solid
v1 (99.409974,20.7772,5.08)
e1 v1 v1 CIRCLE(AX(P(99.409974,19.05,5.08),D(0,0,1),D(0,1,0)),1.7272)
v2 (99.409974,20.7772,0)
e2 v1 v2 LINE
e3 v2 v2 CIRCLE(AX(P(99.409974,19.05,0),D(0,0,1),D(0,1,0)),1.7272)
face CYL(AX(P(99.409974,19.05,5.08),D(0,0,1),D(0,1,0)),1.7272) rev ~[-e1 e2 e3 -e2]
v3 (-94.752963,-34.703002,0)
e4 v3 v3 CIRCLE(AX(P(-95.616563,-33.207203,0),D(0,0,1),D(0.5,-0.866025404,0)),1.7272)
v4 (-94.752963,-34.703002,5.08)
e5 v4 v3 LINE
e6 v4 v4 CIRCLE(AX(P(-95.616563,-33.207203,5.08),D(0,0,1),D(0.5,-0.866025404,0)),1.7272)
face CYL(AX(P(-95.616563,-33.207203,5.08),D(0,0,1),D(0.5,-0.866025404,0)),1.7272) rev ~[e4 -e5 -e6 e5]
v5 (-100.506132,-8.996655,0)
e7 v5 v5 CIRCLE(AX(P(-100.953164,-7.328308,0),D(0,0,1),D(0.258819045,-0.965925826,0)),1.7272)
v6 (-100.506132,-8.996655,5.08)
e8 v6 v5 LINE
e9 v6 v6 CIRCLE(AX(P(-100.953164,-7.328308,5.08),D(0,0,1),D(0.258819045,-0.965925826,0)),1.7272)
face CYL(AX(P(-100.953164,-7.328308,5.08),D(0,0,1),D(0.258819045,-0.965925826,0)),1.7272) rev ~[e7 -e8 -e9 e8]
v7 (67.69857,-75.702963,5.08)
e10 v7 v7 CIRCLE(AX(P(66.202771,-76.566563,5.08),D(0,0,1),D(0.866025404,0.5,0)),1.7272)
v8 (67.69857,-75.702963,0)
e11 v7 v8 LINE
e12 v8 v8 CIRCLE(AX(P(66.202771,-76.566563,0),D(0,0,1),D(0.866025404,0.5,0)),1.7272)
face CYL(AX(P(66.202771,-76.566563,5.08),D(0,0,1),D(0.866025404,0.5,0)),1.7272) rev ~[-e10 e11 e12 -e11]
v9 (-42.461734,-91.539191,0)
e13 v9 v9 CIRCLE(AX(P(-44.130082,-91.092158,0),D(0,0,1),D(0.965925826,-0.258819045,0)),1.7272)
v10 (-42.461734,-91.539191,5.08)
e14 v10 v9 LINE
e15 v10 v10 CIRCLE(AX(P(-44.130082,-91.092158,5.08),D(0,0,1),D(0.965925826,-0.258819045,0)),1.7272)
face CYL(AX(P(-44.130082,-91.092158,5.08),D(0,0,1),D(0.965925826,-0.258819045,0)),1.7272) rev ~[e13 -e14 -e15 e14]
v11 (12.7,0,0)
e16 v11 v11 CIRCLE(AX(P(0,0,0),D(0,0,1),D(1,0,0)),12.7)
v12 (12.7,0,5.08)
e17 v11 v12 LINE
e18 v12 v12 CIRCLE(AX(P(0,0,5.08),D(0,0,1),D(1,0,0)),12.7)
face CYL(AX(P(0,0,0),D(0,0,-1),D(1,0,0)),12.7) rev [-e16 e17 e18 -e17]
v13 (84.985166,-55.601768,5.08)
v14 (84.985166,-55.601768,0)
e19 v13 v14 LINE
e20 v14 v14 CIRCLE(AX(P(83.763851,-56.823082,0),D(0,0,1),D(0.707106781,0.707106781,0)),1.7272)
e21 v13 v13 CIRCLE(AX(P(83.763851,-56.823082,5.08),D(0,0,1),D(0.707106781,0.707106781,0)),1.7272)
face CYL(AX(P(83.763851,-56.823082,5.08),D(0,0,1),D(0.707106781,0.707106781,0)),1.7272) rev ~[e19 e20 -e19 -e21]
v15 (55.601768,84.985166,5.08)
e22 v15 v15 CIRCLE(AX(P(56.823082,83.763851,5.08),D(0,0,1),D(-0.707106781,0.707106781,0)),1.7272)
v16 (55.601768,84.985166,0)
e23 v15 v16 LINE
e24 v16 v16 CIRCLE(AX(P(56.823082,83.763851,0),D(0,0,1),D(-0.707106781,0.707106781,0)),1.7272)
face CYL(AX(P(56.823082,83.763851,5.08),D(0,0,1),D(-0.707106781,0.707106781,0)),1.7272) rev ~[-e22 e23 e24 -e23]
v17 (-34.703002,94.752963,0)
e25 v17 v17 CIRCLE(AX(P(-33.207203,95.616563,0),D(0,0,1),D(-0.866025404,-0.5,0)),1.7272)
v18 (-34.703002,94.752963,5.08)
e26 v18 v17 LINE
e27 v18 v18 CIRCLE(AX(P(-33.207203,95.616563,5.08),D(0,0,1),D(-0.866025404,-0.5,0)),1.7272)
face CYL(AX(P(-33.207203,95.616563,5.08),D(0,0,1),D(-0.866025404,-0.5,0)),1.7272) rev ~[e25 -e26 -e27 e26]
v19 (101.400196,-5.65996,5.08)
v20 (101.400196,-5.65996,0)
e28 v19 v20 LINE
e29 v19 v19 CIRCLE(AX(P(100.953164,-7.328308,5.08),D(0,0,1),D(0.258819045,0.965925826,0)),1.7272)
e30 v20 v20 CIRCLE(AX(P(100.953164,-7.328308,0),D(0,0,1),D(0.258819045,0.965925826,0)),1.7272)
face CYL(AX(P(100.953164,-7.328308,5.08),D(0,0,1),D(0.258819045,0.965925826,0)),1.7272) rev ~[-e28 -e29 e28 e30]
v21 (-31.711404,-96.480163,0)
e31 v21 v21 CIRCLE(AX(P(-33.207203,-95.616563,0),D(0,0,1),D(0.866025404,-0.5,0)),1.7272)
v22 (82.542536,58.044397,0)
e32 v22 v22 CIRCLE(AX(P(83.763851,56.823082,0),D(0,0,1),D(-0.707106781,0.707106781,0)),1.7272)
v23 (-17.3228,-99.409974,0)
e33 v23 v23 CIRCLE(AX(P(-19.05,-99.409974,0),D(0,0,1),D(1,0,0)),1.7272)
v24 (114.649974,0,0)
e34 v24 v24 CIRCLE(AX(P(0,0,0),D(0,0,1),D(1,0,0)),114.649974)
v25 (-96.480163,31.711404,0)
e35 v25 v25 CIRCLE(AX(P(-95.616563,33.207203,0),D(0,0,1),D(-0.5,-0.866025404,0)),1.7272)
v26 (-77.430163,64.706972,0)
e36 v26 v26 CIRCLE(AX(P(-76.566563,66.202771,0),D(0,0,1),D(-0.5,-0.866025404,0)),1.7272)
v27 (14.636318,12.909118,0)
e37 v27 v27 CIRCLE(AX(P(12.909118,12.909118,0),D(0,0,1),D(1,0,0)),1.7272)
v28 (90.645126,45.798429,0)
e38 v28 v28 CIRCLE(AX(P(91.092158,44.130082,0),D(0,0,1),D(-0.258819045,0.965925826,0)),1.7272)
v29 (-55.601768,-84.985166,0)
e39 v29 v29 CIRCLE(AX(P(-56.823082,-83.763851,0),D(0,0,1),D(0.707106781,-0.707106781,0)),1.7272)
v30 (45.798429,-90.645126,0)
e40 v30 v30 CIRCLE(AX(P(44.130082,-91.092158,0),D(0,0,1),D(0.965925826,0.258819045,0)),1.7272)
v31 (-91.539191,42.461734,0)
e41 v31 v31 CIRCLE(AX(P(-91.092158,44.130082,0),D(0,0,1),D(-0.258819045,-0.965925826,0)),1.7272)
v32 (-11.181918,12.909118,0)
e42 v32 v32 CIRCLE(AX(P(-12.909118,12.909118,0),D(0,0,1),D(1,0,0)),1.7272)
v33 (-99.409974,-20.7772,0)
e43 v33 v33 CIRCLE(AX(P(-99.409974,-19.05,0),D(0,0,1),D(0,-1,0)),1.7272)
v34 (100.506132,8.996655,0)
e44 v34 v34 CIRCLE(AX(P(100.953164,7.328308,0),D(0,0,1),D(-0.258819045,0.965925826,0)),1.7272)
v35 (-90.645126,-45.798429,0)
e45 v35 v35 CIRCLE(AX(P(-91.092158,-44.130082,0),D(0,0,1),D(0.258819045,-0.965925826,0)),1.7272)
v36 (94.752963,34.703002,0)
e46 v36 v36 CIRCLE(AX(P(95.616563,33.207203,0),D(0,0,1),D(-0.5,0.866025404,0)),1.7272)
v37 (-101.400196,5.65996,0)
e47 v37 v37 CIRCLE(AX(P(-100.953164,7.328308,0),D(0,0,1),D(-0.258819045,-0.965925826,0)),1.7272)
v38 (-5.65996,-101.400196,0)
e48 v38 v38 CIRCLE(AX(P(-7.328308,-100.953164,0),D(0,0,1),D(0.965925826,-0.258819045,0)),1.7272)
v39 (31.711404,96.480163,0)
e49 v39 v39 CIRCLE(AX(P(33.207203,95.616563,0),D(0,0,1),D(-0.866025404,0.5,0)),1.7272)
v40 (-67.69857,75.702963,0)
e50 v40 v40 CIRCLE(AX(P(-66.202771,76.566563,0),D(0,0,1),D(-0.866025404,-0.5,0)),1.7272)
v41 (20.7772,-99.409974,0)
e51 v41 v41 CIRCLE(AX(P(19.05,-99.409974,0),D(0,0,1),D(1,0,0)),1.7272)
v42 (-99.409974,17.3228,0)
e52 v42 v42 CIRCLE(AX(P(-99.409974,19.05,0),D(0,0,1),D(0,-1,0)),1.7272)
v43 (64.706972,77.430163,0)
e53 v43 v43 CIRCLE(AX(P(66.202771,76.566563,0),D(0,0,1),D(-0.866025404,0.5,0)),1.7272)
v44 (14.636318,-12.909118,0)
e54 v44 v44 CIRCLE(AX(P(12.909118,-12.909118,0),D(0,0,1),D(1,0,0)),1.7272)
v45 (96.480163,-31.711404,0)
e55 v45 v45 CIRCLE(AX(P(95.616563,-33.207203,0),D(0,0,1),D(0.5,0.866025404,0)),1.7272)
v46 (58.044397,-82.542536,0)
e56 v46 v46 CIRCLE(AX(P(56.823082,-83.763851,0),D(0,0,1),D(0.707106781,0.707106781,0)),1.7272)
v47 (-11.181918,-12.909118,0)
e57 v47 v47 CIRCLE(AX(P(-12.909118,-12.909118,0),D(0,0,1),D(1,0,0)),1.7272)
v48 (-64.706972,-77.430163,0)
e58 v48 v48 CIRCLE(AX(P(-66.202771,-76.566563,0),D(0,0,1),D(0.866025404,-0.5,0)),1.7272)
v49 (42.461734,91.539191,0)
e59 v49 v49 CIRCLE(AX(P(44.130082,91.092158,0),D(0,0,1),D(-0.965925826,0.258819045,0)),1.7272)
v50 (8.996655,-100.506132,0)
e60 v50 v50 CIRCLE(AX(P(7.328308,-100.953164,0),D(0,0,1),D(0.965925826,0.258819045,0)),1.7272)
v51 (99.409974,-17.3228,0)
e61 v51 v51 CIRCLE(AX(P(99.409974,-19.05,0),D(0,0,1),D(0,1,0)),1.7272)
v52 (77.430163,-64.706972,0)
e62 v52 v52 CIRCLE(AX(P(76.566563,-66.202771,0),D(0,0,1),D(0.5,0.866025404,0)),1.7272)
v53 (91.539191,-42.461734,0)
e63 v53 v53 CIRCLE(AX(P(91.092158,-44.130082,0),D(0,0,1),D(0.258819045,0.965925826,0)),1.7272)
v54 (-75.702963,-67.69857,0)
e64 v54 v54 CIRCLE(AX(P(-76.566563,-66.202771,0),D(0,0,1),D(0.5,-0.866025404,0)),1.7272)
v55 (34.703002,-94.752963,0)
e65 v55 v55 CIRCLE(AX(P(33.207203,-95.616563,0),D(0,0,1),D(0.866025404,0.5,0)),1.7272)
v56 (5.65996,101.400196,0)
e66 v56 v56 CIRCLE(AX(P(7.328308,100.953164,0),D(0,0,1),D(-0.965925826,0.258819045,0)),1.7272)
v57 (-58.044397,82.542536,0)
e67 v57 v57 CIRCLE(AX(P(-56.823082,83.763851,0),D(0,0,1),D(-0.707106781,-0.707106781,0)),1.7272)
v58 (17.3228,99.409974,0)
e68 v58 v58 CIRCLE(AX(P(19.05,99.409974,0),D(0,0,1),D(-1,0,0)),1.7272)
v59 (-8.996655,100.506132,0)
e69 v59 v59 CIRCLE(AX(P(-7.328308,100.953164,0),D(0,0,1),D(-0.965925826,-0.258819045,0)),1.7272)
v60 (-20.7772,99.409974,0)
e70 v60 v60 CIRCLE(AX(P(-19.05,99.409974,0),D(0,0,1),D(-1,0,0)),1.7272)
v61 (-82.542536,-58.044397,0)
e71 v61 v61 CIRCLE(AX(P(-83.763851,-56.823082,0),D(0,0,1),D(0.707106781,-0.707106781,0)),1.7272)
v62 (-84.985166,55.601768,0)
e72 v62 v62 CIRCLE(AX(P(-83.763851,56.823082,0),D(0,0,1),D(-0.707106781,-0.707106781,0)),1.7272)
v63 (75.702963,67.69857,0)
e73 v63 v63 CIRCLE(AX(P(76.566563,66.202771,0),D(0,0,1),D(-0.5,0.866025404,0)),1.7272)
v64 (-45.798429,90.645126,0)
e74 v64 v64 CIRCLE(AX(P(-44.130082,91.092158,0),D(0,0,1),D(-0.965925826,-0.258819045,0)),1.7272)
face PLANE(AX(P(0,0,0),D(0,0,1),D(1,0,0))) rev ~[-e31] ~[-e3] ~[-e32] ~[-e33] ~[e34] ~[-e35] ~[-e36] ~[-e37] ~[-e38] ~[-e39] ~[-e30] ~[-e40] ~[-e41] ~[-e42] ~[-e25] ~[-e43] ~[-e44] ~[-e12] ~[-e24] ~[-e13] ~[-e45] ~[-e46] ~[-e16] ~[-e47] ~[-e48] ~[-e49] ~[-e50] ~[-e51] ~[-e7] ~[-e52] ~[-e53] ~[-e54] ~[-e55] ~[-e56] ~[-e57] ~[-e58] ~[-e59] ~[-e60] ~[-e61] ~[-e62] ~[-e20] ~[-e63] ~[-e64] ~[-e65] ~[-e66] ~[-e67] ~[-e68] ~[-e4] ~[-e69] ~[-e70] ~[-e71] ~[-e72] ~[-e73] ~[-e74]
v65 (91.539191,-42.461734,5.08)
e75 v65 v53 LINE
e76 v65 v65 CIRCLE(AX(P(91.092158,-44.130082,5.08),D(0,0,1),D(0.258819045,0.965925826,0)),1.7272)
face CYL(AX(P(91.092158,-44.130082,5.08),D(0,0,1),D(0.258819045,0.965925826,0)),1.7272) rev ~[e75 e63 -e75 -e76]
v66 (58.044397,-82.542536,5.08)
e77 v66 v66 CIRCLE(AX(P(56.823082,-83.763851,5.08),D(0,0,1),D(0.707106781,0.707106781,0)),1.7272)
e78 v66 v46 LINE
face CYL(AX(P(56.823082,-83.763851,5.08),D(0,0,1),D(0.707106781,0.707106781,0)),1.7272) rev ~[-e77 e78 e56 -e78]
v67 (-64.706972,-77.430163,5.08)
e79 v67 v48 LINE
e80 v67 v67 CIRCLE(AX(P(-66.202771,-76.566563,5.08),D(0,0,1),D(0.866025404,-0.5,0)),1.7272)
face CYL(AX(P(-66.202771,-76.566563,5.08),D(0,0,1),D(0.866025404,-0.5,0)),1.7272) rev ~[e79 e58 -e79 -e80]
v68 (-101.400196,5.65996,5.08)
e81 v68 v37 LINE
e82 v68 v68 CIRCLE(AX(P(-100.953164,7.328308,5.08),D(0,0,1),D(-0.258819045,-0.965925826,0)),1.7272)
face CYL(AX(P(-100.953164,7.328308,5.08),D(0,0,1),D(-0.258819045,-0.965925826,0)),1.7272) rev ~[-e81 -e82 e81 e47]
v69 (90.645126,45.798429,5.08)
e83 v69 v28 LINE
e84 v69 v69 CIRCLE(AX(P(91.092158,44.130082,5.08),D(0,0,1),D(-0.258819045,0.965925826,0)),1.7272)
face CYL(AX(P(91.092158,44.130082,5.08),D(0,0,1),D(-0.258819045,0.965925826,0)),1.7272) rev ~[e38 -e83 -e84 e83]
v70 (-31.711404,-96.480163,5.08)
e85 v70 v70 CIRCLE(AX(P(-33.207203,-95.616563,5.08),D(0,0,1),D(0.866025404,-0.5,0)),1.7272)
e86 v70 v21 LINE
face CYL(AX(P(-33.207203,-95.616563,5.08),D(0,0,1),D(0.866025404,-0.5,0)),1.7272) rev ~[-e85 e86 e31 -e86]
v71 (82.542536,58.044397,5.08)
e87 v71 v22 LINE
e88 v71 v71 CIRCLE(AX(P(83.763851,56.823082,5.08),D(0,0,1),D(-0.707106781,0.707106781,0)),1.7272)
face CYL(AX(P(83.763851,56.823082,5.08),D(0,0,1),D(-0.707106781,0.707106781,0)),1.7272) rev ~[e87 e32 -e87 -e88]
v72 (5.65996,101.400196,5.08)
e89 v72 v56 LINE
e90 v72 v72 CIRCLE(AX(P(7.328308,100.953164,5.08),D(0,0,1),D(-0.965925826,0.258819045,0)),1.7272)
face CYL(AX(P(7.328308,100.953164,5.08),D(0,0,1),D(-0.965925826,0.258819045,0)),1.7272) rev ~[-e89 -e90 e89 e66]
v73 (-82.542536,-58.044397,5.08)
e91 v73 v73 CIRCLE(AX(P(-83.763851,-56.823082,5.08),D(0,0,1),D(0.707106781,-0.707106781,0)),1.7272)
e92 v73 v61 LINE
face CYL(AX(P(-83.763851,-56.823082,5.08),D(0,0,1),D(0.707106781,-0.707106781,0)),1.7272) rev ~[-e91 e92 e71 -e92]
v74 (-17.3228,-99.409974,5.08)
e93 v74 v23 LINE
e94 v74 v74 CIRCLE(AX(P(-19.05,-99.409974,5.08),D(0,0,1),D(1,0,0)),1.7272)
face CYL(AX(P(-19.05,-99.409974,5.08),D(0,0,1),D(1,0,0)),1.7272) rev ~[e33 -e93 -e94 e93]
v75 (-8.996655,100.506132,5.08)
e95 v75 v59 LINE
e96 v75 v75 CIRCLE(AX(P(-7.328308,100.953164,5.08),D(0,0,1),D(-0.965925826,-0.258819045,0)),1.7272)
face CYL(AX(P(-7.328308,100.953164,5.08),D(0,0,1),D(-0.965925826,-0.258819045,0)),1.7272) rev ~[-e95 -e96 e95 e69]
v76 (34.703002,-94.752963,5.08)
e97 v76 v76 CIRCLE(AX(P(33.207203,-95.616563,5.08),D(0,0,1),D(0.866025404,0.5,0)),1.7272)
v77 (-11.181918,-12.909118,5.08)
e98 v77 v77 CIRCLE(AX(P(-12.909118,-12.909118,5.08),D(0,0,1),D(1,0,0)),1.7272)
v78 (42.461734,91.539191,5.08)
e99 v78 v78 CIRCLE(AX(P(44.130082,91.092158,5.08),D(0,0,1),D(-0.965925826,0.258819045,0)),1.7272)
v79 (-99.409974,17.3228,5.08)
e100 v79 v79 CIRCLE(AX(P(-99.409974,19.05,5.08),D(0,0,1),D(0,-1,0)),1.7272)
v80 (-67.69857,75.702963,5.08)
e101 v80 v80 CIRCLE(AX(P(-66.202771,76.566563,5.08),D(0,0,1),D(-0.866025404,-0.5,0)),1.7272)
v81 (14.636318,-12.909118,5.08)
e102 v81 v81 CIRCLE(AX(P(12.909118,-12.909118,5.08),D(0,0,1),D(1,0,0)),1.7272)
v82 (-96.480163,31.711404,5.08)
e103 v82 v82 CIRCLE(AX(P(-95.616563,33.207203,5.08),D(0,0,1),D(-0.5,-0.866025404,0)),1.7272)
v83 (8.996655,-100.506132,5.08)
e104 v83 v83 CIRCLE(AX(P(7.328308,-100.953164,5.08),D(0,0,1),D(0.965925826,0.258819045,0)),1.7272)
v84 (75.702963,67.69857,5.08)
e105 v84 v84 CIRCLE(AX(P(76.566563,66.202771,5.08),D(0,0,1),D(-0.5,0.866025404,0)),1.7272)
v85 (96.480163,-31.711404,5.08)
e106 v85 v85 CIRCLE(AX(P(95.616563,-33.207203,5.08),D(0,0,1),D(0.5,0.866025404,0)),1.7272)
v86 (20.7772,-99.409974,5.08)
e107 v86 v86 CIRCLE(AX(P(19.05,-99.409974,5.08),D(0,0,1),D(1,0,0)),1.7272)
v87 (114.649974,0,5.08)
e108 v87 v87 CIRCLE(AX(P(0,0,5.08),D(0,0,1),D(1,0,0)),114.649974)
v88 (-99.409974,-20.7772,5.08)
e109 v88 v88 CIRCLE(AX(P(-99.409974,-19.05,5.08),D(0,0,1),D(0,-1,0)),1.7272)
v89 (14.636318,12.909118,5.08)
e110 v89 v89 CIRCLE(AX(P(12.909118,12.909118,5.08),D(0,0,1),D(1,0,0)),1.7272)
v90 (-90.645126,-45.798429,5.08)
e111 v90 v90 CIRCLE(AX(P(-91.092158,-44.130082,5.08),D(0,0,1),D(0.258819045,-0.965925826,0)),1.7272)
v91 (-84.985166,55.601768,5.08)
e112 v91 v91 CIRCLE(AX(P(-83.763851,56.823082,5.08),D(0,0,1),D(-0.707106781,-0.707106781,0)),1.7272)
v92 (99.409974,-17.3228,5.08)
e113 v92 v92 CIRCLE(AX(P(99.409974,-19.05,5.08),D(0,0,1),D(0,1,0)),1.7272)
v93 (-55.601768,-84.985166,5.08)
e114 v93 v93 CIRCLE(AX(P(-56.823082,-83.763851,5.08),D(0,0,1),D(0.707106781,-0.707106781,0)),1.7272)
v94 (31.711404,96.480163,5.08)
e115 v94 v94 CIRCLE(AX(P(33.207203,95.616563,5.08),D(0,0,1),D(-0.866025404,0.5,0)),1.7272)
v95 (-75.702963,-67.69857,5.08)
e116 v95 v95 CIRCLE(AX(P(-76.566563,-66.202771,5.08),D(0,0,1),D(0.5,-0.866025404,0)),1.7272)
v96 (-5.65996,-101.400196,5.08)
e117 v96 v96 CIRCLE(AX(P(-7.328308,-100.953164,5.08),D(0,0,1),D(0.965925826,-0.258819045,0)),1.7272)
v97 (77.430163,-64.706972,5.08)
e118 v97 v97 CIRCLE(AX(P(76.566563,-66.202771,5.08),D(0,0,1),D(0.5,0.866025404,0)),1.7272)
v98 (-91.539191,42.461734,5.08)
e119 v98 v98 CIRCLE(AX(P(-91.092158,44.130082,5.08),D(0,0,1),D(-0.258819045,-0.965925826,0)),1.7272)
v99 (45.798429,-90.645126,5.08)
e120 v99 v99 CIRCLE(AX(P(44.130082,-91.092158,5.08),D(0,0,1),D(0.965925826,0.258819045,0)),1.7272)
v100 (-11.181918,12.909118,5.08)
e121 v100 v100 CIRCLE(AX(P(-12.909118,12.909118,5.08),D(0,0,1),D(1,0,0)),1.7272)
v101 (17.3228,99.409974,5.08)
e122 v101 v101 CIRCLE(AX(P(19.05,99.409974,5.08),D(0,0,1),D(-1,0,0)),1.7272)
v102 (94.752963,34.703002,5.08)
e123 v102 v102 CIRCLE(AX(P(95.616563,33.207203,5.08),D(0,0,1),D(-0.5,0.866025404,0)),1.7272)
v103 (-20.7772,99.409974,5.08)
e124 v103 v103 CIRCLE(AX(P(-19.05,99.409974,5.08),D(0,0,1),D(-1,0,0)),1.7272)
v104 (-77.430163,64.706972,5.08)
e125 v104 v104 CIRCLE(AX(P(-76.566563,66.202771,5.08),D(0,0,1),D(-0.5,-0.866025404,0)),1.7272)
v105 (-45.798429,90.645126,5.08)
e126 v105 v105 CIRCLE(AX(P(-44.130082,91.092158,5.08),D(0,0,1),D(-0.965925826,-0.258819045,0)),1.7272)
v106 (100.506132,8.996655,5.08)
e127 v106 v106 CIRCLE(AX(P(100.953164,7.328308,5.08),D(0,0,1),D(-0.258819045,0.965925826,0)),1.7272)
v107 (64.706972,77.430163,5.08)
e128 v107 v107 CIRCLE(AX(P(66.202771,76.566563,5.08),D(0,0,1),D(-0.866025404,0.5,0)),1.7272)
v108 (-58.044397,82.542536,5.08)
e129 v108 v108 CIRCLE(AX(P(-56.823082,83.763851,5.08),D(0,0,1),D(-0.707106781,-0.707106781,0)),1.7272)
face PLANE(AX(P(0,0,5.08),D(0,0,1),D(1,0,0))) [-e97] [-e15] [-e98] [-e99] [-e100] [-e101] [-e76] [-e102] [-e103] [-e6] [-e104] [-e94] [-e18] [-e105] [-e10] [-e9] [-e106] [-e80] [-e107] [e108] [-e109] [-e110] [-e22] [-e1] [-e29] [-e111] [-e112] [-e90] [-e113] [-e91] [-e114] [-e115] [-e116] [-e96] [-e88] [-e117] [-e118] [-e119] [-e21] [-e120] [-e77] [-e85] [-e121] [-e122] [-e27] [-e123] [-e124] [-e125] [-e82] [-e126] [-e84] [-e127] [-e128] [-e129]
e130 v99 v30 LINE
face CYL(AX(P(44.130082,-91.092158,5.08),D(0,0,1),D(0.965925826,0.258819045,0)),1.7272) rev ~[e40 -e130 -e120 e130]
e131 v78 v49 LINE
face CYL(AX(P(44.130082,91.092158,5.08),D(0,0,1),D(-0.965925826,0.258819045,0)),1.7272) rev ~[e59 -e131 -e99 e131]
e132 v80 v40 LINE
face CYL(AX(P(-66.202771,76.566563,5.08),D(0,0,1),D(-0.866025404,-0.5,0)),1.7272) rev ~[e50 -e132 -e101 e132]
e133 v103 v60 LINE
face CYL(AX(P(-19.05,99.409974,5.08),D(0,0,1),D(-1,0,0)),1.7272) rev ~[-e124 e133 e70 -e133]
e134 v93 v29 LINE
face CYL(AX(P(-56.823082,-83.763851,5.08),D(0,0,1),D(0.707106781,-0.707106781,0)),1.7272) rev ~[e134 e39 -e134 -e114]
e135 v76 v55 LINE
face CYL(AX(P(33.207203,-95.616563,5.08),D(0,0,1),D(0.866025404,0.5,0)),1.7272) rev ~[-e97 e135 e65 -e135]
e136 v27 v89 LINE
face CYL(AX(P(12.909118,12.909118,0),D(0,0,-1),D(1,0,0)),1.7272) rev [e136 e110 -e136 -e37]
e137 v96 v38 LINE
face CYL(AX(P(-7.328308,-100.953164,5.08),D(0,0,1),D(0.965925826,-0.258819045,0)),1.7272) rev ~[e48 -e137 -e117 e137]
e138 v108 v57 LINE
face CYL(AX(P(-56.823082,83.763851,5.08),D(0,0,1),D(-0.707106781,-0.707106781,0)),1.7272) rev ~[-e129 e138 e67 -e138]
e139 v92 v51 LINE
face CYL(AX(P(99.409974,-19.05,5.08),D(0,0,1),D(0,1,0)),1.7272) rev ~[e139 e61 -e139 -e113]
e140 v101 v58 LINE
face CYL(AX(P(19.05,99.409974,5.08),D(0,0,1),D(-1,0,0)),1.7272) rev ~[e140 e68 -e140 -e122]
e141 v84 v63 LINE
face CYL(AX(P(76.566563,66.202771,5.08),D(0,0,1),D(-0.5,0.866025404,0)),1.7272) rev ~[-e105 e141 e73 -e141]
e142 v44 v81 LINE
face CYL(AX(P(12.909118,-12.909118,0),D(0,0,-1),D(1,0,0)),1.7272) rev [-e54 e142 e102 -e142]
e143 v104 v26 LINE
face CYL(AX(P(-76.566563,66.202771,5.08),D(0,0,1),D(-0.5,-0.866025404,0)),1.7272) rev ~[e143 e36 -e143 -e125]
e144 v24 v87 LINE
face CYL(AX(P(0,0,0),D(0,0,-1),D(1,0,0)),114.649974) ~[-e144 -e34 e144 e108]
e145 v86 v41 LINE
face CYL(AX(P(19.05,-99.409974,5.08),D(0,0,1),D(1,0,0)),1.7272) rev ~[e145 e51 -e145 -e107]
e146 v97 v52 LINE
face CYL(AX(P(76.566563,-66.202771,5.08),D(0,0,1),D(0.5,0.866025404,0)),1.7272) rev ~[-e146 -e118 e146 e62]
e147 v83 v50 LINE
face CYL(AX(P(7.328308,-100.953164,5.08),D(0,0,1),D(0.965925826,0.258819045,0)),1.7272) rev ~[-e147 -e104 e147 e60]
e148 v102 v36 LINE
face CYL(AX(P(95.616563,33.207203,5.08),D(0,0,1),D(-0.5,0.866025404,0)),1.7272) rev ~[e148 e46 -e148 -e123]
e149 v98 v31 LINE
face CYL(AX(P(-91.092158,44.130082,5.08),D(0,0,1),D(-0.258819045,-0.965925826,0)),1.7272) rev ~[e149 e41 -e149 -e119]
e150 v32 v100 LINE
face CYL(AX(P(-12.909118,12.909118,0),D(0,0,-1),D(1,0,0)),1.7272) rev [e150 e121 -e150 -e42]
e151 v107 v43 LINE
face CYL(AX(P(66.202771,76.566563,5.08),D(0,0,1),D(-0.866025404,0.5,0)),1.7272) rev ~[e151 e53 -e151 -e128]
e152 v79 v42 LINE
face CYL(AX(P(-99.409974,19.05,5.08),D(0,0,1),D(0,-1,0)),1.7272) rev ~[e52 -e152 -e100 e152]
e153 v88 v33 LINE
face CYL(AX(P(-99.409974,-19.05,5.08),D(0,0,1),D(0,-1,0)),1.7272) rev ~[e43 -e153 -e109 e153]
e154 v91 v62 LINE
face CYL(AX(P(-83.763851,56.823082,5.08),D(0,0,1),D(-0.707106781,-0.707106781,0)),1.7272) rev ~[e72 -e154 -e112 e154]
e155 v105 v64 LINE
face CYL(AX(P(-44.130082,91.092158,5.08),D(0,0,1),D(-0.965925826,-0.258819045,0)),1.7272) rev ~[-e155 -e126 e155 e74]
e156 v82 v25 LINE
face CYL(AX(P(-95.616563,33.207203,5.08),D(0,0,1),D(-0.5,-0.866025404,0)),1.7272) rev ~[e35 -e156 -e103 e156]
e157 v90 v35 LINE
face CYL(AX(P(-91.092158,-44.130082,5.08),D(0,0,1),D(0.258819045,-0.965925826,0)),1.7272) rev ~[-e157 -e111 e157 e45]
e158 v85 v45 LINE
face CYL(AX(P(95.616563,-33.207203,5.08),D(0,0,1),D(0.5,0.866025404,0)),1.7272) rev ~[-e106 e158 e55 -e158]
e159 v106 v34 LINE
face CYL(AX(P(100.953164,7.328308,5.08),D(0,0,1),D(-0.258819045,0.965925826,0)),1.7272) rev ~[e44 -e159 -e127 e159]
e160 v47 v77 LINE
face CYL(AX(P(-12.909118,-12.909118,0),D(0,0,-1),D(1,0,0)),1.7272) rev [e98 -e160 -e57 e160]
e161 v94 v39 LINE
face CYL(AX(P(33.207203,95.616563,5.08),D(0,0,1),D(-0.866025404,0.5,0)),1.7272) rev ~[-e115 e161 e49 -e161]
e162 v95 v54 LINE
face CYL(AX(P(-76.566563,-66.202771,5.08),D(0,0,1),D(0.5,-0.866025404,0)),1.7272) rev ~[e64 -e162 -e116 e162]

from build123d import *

# Parameters (mm, degrees)
F0_R            = 114.6499739
F0_R_2          = 1.7272
F0_R_3          = 12.7
F1_DEPTH        = 5.08
F2_R            = 1.7272
F3_DEPTH        = 5.08
F3_COPIES_COUNT = 24


# Not quite as in the source:
# - a pattern or mirror of a feature is missing from the dataset's text; its kind, count and spacing are read off the source's solid


with BuildPart() as f1:
    # F0 (on Top) → F1 (new body)
    with BuildSketch(Plane.XY):
        Circle(F0_R)
        with Locations((-12.909118174, -12.909118174)):
            Circle(F0_R_2, mode=Mode.SUBTRACT)
        with Locations((12.909118174, -12.909118174)):
            Circle(F0_R_2, mode=Mode.SUBTRACT)
        with Locations((-12.909118174, 12.909118174)):
            Circle(F0_R_2, mode=Mode.SUBTRACT)
        Circle(F0_R_3, mode=Mode.SUBTRACT)
        with Locations((12.909118174, 12.909118174)):
            Circle(F0_R_2, mode=Mode.SUBTRACT)
    extrude(amount=F1_DEPTH)

    # F2 (on face) → F3 (cut, through all)
    with BuildSketch(Plane.XY.offset(5.08)):
        with Locations((19.05, -99.4099739)):
            Circle(F2_R)
        with Locations((-19.05, -99.4099739)):
            Circle(F2_R)
    f3 = extrude(amount=-F3_DEPTH, mode=Mode.SUBTRACT)

    # F3_copies: F3 ×24 about axis
    f3_copies_axis = Axis((0, 0, 0), (0, 0, 1))
    for i in range(1, F3_COPIES_COUNT):
        add(f3.rotate(f3_copies_axis, i * 360 / F3_COPIES_COUNT), mode=Mode.SUBTRACT)


solid = f1.part
